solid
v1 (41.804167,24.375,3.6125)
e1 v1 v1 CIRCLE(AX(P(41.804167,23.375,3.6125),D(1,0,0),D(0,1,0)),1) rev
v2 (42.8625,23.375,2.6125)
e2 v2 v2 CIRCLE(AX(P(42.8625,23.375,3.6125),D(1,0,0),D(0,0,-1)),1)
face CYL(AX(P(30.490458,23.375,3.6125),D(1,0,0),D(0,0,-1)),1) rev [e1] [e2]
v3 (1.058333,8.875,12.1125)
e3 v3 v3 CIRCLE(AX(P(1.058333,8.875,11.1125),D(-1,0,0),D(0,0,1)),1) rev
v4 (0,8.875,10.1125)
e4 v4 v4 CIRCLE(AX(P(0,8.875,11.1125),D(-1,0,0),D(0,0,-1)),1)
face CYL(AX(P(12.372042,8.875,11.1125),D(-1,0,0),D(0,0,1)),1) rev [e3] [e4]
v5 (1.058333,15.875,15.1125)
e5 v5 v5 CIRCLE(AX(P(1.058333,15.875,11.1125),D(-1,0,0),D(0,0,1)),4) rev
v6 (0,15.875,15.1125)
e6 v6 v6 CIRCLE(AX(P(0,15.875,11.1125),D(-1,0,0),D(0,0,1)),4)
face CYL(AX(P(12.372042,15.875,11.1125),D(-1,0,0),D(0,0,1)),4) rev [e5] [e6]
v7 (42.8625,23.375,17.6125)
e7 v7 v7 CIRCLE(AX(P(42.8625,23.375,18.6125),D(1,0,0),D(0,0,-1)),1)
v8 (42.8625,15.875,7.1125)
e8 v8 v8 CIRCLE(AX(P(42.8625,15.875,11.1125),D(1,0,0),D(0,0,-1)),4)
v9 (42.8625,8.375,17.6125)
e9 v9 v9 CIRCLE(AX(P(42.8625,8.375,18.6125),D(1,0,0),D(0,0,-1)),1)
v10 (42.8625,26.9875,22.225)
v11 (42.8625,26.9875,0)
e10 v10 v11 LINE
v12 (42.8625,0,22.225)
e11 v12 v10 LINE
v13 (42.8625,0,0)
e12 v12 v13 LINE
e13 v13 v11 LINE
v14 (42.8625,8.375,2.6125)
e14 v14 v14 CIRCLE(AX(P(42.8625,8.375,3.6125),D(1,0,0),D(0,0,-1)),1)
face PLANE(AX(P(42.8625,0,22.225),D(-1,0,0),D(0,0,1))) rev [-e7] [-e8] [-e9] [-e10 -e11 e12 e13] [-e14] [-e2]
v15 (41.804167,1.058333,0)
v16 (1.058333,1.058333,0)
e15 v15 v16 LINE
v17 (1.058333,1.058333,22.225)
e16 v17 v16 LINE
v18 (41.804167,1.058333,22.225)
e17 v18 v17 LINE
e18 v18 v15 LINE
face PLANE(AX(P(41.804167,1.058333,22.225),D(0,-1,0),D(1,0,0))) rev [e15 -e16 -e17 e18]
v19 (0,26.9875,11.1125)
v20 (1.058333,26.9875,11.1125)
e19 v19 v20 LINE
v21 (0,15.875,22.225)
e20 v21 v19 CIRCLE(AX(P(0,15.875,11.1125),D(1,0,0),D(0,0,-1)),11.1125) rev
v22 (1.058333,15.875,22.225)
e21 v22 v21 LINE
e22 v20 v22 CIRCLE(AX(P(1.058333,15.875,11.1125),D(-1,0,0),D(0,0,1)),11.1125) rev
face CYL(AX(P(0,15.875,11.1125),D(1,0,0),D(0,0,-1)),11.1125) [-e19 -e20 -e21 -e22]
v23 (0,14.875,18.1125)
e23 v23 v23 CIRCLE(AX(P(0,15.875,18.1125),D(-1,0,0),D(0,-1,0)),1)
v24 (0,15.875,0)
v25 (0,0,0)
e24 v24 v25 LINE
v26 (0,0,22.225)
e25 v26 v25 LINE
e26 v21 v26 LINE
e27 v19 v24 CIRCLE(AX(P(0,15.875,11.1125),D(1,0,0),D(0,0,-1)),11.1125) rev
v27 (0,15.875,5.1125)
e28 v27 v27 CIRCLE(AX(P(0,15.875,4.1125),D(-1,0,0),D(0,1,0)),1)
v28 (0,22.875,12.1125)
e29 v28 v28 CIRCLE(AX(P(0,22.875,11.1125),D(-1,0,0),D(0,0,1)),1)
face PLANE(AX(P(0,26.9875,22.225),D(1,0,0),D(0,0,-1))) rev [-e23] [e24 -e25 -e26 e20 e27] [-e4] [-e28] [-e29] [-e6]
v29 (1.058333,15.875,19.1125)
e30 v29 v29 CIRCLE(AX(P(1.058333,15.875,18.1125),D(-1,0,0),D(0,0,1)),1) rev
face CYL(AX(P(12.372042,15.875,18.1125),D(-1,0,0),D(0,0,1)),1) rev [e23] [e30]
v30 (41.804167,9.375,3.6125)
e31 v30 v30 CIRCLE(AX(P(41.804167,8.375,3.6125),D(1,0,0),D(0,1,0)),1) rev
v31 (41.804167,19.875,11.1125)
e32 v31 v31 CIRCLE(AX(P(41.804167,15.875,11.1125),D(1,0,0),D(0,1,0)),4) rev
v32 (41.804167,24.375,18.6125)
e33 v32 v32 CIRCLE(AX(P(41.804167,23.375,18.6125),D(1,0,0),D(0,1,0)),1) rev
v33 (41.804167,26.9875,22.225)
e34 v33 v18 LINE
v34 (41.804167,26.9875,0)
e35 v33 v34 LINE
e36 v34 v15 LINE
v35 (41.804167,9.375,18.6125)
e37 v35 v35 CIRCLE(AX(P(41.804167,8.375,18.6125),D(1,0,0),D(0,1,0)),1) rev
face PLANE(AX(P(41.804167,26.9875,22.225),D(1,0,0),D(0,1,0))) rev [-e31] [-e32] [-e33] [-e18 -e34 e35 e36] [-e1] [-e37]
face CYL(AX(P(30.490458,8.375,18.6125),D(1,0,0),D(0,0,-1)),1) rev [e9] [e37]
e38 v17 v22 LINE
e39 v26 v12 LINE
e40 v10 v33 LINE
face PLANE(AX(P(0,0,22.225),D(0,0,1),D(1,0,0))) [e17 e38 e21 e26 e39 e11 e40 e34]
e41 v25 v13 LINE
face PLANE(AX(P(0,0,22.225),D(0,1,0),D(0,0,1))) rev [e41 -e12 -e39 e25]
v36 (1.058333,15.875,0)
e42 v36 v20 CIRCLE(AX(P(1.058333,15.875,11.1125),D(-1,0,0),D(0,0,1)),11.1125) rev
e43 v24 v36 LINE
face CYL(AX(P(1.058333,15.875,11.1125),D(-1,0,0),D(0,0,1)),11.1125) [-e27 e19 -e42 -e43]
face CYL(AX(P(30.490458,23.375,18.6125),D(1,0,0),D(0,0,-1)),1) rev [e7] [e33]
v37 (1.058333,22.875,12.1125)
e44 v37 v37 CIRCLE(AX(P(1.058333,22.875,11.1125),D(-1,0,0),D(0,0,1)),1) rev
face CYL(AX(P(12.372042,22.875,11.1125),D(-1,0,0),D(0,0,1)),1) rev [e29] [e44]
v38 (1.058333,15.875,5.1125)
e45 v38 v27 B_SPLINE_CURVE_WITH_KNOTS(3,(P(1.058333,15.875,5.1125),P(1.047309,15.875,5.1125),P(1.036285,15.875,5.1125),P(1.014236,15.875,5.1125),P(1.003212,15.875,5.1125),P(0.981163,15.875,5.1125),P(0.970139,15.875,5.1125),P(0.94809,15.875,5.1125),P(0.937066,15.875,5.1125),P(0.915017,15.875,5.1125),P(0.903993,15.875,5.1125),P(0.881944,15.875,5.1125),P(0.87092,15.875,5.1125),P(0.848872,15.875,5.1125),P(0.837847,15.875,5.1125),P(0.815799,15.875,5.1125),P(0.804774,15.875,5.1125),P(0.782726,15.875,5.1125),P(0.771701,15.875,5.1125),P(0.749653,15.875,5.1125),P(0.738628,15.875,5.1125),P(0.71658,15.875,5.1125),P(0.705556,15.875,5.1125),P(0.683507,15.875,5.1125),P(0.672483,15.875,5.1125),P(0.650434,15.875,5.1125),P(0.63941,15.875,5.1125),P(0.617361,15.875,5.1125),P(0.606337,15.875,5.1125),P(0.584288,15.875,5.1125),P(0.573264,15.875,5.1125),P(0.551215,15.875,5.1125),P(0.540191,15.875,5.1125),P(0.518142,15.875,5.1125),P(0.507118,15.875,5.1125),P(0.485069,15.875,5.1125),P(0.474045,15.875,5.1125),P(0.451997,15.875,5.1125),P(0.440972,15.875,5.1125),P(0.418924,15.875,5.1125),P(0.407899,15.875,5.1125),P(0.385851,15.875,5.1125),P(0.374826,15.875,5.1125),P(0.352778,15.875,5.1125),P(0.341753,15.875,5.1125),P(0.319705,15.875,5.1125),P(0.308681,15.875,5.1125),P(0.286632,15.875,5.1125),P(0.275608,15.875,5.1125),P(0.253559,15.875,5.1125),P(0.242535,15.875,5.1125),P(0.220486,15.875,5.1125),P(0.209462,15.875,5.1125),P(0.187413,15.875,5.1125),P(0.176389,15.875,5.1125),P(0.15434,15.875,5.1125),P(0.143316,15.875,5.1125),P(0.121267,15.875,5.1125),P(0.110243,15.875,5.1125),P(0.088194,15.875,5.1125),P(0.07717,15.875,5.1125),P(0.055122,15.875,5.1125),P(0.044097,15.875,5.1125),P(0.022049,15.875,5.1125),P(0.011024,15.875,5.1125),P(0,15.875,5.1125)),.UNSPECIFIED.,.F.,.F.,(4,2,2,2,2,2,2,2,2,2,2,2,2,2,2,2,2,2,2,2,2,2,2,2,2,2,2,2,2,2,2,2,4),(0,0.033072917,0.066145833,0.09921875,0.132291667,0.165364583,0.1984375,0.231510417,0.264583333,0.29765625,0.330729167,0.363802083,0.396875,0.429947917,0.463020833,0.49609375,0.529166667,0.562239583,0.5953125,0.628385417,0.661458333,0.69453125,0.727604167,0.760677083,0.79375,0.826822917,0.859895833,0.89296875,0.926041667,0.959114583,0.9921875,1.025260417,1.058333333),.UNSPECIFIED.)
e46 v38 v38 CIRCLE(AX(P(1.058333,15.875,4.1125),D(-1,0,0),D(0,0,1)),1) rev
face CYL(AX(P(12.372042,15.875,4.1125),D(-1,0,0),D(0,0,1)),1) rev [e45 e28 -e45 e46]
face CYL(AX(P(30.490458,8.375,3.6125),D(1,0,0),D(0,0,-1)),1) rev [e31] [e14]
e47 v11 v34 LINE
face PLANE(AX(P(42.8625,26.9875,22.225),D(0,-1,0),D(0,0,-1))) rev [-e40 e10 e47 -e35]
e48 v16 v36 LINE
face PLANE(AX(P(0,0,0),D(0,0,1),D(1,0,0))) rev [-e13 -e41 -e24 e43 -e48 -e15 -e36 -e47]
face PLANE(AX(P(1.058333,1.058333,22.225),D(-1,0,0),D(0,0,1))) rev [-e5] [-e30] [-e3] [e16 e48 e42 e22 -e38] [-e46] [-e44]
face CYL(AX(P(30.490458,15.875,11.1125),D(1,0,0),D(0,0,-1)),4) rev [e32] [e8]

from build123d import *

# Parameters (mm, degrees)
BOSS_EXTRUDE1_DEPTH = 22.225
FILLET1_R           = 11.1125
SKETCH3_R           = 4
SKETCH3_R_2         = 1
CUT_EXTRUDE2_DEPTH  = 1.058333333
CIRPATTERN1_COUNT   = 4
CUT_EXTRUDE3_START  = -1.058333333
SKETCH2_R           = 1
SKETCH2_R_2         = 4
CUT_EXTRUDE3_DEPTH  = 1.058333333


with BuildPart() as part:
    # Sketch1 → Boss-Extrude1 (new body)
    with BuildSketch(Plane.XY):
        Polygon((0, 26.9875), (0, 0), (42.8625, 0), (42.8625, 26.9875), (41.804166667, 26.9875), (41.804166667, 1.058333333), (1.058333333, 1.058333333), (1.058333333, 26.9875), align=None)
    extrude(amount=BOSS_EXTRUDE1_DEPTH)

    # Fillet1
    fillet1_edges = [part.edges().sort_by_distance(p)[0] for p in [
        (0.529166667, 26.9875, 0),
        (0.529166667, 26.9875, 22.225),
    ]]
    fillet(fillet1_edges, radius=FILLET1_R - 0.0001)  # a hair under: the kernel refuses the full size

    # Sketch3 → Cut-Extrude2 (cut)
    with BuildSketch(Plane.ZY):
        with Locations((11.1125, 15.875)):
            Circle(SKETCH3_R)
        with Locations((11.1125, 22.875)):
            Circle(SKETCH3_R_2)
    cut_extrude2 = extrude(amount=-CUT_EXTRUDE2_DEPTH, mode=Mode.SUBTRACT)

    # CirPattern1: Cut-Extrude2 ×4 about axis
    cirpattern1_axis = Axis((0, 15.875, 11.1125), (1, 0, 0))
    for i in range(1, CIRPATTERN1_COUNT):
        add(cut_extrude2.rotate(cirpattern1_axis, i * 360 / CIRPATTERN1_COUNT), mode=Mode.SUBTRACT)

    # Sketch2 → Cut-Extrude3 (cut)
    with BuildSketch(Plane(origin=(42.8625, 0, 0), x_dir=(0, 0, -1), z_dir=(1, 0, 0)).offset(CUT_EXTRUDE3_START)):
        with Locations((-3.6125, 23.375)):
            Circle(SKETCH2_R)
        with Locations((-18.6125, 23.375)):
            Circle(SKETCH2_R)
        with Locations((-3.6125, 8.375)):
            Circle(SKETCH2_R)
        with Locations((-18.6125, 8.375)):
            Circle(SKETCH2_R)
        with Locations(Location((-11.1125, 15.875, 0), (0, 0, 180))):
            Circle(SKETCH2_R_2)
    extrude(amount=CUT_EXTRUDE3_DEPTH, mode=Mode.SUBTRACT)


solid = part.part
